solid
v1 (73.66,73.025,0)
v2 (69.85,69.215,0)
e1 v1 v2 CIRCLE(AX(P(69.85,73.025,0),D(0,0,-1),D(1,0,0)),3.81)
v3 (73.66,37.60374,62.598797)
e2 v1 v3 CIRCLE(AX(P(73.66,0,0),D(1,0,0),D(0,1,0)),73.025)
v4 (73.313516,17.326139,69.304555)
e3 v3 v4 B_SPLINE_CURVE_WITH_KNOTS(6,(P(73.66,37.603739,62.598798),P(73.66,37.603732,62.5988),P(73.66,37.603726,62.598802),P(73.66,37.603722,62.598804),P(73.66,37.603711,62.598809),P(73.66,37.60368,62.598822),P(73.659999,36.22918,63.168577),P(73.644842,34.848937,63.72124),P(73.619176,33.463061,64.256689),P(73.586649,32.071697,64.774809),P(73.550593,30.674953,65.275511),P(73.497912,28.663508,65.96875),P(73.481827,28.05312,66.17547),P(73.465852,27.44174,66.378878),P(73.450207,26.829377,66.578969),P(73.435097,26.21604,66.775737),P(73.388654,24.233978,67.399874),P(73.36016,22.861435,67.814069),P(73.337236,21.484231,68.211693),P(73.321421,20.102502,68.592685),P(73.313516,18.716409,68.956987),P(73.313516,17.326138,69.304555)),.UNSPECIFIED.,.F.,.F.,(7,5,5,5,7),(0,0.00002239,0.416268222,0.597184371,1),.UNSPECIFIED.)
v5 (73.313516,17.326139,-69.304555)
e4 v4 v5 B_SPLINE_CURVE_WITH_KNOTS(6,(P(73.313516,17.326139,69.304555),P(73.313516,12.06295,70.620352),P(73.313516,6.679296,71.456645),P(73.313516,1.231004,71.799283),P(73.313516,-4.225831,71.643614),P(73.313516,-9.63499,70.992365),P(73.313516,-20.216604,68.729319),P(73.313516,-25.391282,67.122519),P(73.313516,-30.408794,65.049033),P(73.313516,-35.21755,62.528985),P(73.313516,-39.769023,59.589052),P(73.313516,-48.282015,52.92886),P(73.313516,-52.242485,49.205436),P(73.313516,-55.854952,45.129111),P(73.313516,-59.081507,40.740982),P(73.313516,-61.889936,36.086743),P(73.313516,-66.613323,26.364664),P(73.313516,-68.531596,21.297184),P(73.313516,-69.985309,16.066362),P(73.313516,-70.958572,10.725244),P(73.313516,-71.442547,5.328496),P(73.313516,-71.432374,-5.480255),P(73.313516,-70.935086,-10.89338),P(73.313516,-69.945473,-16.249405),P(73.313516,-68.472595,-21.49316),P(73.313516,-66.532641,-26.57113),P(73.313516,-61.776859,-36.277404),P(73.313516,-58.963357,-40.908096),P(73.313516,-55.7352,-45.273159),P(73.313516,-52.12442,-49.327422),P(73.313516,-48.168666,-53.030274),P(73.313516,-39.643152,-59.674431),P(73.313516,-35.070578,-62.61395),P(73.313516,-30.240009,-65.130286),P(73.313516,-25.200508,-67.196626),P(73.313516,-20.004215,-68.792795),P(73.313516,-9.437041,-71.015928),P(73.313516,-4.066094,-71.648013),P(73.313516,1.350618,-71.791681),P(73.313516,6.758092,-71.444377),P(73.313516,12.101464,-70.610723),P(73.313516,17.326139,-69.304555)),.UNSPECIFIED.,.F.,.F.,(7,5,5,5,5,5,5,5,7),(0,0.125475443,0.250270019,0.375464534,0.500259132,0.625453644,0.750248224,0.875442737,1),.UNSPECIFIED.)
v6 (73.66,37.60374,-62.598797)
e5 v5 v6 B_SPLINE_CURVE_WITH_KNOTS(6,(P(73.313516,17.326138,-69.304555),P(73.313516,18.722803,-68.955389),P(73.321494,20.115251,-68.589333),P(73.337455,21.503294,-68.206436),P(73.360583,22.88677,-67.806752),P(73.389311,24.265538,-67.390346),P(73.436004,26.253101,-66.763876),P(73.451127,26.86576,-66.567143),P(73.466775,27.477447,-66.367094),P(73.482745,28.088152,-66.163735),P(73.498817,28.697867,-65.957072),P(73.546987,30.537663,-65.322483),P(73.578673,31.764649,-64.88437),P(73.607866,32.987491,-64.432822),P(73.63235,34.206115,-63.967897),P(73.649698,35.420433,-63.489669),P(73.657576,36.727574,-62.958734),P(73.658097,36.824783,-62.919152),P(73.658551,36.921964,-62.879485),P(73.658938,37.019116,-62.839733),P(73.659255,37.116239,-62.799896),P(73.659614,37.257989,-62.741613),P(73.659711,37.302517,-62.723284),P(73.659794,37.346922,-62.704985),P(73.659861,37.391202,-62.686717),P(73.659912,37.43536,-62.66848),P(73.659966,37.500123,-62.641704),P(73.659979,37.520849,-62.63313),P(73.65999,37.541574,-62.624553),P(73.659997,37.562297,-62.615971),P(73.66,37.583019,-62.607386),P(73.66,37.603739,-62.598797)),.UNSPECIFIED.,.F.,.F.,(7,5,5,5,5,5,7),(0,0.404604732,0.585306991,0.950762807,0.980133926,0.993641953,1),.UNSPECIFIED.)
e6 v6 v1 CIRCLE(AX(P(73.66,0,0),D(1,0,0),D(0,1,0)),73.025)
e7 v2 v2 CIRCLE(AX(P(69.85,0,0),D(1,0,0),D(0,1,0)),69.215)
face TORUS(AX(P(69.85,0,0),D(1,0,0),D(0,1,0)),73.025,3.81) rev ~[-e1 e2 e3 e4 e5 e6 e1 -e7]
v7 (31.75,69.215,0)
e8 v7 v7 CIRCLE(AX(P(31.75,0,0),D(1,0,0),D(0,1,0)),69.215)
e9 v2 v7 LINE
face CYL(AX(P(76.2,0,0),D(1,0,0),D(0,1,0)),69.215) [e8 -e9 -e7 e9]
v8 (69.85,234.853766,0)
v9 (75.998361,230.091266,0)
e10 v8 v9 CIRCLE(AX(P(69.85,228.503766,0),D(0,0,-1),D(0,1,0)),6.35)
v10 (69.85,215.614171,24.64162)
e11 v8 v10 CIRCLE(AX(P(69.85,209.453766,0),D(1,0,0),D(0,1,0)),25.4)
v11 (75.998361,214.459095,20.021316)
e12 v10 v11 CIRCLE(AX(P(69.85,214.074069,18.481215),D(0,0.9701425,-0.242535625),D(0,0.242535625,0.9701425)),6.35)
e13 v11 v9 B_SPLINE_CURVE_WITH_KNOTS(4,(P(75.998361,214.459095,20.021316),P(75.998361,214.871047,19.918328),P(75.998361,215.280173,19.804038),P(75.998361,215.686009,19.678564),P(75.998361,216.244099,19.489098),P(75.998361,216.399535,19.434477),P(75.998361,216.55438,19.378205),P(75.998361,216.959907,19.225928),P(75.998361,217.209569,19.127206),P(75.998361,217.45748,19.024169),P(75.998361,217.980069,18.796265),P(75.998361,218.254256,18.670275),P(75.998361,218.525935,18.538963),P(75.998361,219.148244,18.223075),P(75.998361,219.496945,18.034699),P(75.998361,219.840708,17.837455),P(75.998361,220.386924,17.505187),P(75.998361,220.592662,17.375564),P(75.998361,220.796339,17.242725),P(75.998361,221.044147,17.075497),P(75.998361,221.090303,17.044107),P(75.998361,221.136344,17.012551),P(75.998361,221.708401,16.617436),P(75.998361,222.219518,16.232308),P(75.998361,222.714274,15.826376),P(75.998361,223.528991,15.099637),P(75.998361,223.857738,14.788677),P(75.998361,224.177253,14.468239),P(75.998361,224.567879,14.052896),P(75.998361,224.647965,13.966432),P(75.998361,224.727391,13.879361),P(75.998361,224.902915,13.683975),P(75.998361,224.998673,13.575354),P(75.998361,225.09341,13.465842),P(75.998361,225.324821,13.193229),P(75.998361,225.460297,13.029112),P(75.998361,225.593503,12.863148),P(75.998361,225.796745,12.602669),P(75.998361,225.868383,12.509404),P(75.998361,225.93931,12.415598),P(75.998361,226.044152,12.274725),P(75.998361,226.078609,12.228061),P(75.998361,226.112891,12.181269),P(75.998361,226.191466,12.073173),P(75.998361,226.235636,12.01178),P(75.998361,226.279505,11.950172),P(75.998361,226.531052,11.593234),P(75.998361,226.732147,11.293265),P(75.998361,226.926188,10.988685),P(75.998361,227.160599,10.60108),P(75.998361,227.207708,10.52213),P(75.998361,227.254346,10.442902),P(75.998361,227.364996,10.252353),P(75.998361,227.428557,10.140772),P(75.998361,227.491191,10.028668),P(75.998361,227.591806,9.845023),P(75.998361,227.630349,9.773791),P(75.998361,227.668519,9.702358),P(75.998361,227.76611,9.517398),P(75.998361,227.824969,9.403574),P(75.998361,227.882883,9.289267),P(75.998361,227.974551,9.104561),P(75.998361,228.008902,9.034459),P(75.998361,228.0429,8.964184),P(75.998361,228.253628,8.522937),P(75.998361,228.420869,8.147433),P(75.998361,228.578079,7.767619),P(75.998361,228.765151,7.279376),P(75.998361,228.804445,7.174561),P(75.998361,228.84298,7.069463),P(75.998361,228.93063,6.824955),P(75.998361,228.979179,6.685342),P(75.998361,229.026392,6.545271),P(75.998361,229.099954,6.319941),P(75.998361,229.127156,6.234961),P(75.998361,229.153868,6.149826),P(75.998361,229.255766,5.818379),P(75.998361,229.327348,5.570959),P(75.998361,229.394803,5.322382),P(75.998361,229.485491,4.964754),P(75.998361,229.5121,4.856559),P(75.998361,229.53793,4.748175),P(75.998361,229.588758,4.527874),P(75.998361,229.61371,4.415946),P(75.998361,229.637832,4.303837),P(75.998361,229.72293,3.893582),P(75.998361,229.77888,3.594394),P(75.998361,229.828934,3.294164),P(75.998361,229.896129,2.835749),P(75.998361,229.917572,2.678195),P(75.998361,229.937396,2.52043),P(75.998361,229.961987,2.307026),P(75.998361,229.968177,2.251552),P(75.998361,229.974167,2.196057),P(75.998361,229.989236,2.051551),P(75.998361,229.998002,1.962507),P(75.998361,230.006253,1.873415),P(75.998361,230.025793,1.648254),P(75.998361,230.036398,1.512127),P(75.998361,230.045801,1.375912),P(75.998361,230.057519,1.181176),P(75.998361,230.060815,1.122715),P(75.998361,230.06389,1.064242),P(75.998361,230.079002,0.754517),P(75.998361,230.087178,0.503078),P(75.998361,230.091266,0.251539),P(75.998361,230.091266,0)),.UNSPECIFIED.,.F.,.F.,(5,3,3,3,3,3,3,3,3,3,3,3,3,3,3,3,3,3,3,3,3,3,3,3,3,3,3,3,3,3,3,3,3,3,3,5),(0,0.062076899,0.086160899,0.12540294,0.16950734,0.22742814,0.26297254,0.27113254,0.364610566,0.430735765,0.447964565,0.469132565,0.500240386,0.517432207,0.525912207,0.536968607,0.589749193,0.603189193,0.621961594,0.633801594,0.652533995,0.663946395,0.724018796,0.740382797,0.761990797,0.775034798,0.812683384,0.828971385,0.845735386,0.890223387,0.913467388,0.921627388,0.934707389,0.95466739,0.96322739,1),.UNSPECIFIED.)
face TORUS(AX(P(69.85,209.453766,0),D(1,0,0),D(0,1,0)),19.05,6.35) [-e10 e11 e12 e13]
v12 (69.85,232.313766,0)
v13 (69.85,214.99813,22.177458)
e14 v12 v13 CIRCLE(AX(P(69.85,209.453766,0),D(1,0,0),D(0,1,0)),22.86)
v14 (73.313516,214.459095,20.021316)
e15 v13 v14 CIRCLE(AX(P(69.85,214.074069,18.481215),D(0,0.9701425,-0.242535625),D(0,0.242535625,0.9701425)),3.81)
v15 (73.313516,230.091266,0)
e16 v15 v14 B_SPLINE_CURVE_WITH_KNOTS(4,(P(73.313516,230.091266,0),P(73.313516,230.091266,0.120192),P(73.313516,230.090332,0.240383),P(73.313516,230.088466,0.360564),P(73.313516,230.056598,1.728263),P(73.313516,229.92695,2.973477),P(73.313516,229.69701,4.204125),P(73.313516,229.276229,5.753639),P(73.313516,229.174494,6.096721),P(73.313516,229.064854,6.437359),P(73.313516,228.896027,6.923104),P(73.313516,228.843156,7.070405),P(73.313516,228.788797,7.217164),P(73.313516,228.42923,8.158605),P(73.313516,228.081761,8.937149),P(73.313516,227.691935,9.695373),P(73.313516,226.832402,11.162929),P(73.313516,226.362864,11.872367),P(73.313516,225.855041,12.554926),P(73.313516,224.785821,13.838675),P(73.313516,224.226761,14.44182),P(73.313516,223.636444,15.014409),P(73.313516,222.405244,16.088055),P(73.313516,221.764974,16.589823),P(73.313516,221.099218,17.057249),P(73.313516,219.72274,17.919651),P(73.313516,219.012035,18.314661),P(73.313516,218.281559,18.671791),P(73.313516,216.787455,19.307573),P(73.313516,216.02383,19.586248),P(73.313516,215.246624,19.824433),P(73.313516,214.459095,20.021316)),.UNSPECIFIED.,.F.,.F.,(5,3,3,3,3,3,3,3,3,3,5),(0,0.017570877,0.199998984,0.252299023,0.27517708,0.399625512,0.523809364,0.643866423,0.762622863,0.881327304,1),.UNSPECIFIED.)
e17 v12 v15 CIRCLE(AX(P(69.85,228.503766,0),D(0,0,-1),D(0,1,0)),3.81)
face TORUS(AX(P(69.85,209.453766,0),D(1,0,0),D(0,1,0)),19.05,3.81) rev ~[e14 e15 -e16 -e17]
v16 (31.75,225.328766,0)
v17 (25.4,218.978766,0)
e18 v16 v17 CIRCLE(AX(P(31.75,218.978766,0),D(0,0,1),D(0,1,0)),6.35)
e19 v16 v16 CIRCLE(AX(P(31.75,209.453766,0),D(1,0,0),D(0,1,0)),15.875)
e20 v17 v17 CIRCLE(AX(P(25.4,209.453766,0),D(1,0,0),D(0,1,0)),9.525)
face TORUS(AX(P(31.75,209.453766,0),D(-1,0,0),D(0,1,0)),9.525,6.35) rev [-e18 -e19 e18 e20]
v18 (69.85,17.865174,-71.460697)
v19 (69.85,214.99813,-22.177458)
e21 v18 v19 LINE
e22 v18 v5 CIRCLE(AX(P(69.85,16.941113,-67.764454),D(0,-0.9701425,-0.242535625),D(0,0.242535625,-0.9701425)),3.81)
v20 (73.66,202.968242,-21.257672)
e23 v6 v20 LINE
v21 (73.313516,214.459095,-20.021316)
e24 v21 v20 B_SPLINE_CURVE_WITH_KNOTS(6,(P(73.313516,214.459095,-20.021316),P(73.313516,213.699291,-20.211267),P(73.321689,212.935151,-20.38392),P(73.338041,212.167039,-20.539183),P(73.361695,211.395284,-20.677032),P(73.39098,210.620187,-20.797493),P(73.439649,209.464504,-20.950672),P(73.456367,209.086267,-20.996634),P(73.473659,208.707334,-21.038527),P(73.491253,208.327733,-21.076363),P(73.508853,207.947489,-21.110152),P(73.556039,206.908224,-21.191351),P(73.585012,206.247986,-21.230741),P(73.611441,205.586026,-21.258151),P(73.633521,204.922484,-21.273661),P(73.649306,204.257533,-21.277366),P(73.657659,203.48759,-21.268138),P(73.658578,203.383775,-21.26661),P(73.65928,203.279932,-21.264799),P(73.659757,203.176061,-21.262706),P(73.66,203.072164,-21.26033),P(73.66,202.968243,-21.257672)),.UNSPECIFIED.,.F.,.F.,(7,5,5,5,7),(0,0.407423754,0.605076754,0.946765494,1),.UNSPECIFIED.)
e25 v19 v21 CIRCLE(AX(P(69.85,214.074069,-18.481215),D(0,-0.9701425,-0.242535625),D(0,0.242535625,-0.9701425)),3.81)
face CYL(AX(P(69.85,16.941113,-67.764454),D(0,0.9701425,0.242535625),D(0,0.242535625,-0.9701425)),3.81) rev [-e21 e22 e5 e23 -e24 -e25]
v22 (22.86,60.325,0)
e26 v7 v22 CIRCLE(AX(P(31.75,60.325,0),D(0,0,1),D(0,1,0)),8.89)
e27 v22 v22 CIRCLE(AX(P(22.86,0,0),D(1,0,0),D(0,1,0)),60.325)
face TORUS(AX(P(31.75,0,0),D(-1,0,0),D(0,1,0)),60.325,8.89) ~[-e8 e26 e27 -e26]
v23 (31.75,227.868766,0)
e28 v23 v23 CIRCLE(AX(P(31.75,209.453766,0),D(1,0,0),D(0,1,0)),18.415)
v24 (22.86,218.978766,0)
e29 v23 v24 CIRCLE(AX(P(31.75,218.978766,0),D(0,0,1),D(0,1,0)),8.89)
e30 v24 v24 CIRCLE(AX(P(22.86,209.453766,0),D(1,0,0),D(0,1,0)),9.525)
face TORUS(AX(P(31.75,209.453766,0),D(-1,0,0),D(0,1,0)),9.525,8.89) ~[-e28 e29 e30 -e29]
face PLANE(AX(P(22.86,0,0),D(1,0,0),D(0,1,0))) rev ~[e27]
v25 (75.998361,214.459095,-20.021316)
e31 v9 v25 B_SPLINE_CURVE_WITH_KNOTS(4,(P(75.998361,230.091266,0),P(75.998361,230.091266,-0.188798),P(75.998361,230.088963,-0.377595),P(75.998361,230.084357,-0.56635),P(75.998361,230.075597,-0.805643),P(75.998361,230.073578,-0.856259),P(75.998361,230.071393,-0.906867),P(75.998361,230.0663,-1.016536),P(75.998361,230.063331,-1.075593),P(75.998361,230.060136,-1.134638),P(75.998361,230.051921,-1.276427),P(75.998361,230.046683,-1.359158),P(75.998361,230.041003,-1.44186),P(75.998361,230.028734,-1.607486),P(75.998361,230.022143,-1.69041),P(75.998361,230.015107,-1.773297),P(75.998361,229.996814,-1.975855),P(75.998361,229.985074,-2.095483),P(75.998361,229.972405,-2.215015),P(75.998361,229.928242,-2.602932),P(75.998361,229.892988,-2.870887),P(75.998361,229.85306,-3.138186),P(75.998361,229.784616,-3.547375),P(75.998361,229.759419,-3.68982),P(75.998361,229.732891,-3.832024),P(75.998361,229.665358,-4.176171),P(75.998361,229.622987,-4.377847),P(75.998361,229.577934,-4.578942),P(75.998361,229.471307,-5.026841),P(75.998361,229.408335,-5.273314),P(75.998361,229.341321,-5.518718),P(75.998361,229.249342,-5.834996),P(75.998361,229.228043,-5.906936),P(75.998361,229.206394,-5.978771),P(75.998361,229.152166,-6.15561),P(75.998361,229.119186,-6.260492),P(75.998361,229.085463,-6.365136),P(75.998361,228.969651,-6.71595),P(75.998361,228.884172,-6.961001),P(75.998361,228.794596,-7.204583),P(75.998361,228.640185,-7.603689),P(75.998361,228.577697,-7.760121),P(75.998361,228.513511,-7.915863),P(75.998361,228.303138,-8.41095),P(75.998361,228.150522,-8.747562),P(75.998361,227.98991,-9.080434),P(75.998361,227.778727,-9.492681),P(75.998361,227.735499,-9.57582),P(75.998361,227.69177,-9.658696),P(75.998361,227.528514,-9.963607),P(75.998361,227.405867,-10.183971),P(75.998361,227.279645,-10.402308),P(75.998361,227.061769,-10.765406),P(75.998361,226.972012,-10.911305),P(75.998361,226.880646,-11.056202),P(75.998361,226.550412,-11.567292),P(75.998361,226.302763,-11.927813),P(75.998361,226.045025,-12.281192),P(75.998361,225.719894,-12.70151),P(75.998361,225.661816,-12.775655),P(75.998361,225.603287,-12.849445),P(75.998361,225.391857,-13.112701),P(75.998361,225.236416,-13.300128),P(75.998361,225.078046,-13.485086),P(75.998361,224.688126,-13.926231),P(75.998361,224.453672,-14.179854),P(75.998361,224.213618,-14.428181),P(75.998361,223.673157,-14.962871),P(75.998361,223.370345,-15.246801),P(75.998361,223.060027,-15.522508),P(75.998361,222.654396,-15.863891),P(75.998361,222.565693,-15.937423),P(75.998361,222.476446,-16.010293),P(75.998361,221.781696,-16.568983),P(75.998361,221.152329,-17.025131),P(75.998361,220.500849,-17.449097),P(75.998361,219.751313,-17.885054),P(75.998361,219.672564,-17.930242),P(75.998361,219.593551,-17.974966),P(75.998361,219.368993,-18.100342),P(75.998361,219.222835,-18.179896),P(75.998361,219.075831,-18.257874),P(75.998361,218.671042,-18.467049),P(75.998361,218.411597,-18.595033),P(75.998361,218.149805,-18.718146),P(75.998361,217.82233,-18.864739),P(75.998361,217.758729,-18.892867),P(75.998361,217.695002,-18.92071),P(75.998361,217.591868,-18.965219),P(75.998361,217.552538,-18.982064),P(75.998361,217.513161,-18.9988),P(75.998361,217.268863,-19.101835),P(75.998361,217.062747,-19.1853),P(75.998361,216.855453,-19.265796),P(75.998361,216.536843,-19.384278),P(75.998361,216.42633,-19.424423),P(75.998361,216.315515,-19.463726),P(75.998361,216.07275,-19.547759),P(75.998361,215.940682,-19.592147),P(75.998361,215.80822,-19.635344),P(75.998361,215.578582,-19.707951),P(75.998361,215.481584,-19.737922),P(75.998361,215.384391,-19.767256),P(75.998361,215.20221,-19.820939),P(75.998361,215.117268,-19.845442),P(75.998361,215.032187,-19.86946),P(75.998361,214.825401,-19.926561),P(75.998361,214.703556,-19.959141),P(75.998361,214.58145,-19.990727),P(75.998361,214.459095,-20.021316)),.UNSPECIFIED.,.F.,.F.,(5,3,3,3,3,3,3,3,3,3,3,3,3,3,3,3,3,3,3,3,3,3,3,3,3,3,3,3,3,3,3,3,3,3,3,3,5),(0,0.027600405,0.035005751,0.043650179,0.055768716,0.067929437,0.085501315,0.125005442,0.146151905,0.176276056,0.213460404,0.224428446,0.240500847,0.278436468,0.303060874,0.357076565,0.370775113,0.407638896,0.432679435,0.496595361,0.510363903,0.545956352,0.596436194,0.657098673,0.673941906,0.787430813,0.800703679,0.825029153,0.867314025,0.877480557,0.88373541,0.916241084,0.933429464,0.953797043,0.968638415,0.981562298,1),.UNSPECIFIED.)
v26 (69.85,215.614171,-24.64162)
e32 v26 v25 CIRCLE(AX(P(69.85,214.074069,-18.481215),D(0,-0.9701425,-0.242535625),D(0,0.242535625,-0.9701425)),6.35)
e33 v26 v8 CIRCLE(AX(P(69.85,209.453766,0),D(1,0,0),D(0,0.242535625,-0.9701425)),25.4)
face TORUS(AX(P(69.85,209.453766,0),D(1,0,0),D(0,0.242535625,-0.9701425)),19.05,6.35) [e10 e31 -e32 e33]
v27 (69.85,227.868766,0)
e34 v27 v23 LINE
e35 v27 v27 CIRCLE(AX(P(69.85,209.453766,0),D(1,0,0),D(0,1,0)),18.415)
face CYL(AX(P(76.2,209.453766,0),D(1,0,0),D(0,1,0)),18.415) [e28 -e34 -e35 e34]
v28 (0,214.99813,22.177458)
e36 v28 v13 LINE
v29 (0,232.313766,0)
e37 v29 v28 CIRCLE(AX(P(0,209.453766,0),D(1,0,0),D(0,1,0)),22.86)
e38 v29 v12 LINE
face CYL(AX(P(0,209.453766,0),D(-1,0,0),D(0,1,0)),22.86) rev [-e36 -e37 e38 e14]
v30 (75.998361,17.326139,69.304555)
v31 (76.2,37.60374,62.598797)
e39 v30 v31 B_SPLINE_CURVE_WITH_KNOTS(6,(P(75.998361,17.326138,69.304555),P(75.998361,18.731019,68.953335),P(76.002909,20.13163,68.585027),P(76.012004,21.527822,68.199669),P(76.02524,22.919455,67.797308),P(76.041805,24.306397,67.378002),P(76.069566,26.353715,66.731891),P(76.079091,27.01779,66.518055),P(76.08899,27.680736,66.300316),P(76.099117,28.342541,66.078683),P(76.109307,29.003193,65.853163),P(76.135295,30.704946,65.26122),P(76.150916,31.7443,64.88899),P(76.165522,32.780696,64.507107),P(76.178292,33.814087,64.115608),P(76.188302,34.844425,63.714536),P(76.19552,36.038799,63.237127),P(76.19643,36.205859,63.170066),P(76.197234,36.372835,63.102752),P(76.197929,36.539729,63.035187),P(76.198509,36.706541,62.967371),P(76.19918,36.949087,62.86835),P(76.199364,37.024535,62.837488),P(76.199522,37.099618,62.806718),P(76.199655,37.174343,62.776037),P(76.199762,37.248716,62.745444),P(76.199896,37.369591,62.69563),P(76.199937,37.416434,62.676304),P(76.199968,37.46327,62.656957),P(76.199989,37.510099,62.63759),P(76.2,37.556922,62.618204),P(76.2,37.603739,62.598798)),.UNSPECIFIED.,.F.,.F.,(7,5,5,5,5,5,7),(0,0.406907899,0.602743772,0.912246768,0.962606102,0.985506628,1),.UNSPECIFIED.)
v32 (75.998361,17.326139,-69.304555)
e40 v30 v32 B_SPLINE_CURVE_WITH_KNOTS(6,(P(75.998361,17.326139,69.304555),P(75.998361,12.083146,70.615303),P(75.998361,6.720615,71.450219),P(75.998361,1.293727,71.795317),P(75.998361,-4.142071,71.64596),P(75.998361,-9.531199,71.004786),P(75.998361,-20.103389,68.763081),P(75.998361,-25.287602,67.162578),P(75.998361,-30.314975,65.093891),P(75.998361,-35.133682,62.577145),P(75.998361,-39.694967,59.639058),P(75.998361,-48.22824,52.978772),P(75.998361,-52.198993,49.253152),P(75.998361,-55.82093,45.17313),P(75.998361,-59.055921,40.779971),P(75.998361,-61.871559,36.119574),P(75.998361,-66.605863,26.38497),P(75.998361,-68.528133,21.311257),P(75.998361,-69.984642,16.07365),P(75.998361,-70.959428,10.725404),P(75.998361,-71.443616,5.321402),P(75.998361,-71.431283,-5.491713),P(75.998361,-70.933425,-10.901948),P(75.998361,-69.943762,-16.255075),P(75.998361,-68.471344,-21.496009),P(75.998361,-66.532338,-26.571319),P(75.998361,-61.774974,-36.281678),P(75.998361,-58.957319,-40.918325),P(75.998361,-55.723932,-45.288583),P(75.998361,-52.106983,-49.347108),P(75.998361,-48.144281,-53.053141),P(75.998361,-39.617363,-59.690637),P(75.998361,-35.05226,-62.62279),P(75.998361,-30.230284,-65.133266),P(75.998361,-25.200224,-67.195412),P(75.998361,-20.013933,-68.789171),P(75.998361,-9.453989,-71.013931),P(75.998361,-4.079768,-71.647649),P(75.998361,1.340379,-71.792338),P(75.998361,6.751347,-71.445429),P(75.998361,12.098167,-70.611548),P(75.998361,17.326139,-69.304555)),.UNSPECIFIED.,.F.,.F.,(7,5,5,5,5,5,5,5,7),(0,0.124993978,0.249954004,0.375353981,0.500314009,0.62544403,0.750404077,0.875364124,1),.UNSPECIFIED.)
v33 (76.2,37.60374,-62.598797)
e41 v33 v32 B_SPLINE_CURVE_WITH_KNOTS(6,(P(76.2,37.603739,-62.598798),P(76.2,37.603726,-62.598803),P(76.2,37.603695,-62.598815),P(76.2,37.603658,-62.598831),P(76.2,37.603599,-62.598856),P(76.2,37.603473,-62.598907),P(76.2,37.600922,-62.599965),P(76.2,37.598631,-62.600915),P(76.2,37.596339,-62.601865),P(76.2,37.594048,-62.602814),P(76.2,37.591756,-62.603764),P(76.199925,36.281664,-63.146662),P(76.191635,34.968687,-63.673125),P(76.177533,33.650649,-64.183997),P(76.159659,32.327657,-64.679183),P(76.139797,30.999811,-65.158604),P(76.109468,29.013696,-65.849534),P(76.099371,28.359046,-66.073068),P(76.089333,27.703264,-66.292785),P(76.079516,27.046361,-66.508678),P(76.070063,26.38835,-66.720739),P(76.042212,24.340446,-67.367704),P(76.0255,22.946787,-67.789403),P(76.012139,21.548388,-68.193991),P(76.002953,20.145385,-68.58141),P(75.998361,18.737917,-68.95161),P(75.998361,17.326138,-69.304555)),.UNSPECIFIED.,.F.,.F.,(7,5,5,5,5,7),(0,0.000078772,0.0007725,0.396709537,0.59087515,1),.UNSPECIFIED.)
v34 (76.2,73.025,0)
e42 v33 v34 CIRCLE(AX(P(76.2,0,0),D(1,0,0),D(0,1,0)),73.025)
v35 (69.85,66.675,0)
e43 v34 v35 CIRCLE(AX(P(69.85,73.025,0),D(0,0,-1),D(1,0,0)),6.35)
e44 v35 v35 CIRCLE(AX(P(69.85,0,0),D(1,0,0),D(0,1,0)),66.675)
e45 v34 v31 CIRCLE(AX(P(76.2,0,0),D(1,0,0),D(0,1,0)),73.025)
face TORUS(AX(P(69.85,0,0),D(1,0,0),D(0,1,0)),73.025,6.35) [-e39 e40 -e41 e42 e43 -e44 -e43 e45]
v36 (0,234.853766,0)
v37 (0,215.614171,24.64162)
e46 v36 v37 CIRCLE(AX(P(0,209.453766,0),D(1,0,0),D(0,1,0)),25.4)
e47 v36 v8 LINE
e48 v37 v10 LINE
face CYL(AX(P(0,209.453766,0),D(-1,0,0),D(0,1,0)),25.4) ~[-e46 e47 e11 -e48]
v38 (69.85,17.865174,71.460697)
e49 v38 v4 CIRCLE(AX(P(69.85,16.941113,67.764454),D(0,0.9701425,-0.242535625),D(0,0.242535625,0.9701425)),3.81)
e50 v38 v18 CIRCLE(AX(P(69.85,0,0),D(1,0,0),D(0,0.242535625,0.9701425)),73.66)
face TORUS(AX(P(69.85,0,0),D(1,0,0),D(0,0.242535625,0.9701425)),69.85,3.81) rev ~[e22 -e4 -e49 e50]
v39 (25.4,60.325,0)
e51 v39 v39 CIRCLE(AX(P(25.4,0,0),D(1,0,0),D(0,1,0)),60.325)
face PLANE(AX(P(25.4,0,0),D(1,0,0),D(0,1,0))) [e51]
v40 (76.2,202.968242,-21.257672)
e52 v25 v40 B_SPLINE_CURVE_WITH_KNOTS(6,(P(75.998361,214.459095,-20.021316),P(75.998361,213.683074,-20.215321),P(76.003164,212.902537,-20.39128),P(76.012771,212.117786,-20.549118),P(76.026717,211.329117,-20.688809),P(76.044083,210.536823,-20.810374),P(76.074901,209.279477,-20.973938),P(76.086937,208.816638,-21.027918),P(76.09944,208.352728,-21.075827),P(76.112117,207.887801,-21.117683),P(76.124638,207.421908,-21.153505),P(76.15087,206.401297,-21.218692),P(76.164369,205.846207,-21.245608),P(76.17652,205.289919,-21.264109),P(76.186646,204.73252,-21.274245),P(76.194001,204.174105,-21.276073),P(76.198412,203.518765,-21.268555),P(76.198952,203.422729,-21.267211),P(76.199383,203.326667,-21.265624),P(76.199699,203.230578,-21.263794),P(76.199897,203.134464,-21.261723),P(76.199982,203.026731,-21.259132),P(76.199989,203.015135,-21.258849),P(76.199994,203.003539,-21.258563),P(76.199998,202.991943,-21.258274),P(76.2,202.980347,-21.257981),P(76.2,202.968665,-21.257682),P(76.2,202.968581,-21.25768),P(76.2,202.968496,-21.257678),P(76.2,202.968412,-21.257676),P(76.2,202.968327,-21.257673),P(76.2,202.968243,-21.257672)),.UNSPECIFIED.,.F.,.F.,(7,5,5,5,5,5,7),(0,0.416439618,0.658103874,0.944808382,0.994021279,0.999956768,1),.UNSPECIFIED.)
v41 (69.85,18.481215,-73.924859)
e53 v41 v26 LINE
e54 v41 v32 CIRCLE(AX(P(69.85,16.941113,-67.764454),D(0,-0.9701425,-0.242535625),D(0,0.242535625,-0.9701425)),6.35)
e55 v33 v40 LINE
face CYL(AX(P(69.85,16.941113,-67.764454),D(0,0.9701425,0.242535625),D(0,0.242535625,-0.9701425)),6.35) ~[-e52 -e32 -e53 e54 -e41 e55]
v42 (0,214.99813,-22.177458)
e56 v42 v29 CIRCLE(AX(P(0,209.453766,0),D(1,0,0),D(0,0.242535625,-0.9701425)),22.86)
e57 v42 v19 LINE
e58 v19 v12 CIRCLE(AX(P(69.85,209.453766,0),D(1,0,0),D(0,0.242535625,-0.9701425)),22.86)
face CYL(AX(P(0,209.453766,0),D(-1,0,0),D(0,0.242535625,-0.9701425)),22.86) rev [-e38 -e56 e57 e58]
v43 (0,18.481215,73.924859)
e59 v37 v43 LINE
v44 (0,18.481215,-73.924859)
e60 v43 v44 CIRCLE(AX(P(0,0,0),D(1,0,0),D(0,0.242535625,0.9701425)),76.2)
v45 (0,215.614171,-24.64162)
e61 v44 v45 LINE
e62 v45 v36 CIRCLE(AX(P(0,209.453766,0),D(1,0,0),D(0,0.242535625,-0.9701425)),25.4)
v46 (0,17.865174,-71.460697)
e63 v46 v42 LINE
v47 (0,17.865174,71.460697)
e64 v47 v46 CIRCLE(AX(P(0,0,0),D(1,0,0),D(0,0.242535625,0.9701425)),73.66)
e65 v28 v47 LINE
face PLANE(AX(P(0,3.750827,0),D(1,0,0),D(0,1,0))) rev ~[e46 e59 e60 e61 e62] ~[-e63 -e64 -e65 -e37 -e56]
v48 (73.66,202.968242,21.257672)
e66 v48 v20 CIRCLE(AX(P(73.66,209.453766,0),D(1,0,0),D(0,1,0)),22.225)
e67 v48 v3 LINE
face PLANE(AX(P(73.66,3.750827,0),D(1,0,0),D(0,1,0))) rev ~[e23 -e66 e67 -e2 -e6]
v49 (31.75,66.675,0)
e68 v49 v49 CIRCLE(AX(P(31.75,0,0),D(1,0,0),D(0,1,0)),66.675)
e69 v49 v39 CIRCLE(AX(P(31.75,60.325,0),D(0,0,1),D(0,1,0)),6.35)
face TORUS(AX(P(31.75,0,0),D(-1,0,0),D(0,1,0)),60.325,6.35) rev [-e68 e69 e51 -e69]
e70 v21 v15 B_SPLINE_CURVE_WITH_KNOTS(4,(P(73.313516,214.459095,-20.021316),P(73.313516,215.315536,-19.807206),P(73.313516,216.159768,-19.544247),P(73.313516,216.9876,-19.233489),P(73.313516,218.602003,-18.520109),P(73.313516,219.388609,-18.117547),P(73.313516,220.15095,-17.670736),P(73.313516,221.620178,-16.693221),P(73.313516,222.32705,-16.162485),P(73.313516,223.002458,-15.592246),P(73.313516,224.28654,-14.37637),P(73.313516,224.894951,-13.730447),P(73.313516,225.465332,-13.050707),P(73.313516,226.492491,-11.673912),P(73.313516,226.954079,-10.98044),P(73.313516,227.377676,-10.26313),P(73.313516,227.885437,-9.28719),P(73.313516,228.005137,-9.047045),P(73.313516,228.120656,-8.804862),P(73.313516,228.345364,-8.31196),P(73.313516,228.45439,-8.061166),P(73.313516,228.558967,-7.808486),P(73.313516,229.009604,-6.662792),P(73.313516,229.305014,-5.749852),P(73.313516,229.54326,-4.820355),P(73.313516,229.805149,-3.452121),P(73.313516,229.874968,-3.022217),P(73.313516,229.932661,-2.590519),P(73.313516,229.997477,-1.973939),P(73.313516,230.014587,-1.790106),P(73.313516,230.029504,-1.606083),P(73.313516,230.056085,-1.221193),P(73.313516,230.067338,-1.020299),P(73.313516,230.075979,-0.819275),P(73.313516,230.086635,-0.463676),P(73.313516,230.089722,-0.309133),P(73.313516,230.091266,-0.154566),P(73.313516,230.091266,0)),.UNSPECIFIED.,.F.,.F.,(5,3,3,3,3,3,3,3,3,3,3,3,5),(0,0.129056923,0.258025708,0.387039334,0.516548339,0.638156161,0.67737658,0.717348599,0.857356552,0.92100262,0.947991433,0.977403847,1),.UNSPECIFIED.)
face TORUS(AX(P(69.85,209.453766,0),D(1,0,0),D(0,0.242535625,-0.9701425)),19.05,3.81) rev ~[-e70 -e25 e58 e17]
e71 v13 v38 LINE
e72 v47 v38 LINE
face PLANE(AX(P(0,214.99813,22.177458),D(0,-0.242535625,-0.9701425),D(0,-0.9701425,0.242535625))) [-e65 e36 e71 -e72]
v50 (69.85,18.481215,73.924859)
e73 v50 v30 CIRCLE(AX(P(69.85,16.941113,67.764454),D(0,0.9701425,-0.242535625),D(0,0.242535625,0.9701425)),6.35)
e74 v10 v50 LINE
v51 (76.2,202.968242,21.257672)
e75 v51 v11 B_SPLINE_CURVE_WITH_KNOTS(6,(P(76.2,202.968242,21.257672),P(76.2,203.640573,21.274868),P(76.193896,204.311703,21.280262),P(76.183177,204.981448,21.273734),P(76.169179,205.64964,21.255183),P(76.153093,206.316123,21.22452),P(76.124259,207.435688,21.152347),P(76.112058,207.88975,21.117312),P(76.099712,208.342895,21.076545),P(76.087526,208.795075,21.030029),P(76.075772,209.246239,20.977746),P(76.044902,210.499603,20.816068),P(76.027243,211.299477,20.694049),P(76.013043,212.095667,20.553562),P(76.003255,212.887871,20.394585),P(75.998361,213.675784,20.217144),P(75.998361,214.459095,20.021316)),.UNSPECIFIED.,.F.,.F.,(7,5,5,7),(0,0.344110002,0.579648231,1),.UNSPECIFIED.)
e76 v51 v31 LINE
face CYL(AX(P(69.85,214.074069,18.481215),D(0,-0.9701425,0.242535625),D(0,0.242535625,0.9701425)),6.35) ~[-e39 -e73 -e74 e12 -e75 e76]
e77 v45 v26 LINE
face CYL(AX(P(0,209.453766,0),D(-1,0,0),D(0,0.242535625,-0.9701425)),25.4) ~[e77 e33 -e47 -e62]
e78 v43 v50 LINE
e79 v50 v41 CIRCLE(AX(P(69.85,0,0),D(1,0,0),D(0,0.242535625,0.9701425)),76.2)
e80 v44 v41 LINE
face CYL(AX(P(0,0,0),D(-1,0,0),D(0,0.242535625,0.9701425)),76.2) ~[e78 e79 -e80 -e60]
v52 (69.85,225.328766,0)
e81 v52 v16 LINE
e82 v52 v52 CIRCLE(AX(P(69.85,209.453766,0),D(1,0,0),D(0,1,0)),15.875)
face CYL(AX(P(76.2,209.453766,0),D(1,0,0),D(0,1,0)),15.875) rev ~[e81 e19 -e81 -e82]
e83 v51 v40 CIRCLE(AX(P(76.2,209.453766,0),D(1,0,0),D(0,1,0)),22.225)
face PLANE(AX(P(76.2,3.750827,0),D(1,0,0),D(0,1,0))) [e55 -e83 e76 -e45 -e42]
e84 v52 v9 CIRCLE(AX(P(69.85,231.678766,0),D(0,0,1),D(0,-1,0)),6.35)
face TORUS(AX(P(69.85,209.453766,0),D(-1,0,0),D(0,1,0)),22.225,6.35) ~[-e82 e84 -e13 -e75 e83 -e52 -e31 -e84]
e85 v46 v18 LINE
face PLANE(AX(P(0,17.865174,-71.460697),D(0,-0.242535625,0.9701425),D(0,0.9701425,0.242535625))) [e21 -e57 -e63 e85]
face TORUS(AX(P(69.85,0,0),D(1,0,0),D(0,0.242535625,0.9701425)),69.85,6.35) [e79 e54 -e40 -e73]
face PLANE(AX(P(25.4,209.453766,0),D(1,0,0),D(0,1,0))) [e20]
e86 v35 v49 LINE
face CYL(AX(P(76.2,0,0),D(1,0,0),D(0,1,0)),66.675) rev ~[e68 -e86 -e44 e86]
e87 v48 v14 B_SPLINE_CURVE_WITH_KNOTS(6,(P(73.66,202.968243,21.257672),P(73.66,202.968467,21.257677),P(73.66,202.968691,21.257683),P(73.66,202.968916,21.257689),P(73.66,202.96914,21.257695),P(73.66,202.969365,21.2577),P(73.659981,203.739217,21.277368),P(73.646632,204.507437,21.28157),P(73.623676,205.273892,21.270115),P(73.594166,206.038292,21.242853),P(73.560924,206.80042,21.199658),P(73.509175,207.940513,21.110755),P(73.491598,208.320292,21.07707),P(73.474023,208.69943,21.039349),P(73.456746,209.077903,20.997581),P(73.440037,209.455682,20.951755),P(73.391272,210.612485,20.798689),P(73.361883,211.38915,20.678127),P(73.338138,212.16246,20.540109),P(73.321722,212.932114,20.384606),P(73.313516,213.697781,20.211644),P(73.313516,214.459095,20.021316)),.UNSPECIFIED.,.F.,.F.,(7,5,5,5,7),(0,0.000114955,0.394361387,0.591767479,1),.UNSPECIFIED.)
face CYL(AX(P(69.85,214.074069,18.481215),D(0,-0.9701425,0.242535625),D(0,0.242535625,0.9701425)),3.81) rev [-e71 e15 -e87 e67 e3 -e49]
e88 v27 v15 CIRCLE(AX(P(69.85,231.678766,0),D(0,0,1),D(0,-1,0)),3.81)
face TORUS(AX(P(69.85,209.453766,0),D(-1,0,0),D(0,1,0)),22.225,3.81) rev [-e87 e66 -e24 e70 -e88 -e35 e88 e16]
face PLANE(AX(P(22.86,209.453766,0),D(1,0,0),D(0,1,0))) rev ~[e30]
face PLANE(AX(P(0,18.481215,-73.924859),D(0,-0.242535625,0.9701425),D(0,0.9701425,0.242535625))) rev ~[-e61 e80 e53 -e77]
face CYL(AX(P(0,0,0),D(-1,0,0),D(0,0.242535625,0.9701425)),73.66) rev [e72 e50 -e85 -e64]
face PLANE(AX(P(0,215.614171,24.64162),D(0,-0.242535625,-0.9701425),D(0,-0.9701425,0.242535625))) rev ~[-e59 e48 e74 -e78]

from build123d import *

# Parameters (mm, degrees)
F1_DEPTH = 76.2
F2_R     = 66.675
F2_R_2   = 15.875
F3_DEPTH = 50.8
F4_F1_R  = 6.35
F4_F2_R  = 6.35
F4_F3_R  = 6.35
F5_T     = -2.54


# Not quite as in the source:
# - a fillet or chamfer that OpenCascade refuses, or shapes differently, is made with other operations: its cross-section is extruded or revolved along the edge and cut away or added


with BuildPart() as f1:
    # F0 (on Right) → F1 (new body)
    with BuildSketch(Plane.YZ):
        with BuildLine():
            ThreePointArc((18.4812146278, -73.9248585111), (60.0612543768, -46.8944103565), (76.2, 0))
            ThreePointArc((76.2, 0), (60.0612543768, 46.8944103565), (18.4812146278, 73.9248585111))
            ThreePointArc((18.4812146278, 73.9248585111), (-76.2, 0), (18.4812146278, -73.9248585111))
        make_face()
        with BuildLine():
            ThreePointArc((18.4812146278, 73.9248585111), (60.0612543768, 46.8944103565), (76.2, 0))
            ThreePointArc((76.2, 0), (60.0612543768, -46.8944103565), (18.4812146278, -73.9248585111))
            Line((18.4812146278, -73.9248585111), (215.6141706573, -24.6416195037))
            ThreePointArc((215.6141706573, -24.6416195037), (184.0537657814, 0), (215.6141706573, 24.6416195037))
            Line((215.6141706573, 24.6416195037), (18.4812146278, 73.9248585111))
        make_face()
        with BuildLine():
            ThreePointArc((234.8537657814, 0), (229.474183907, 15.6314701188), (215.6141706573, 24.6416195037))
            ThreePointArc((215.6141706573, 24.6416195037), (184.0537657814, 0), (215.6141706573, -24.6416195037))
            ThreePointArc((215.6141706573, -24.6416195037), (229.474183907, -15.6314701188), (234.8537657814, 0))
        make_face()
    extrude(amount=F1_DEPTH)

    # F2 (on face) → F3 (cut)
    with BuildSketch(Plane.YZ.offset(76.2)):
        Circle(F2_R)
        with Locations((209.4537657814, 0)):
            Circle(F2_R_2)
    extrude(amount=-F3_DEPTH, mode=Mode.SUBTRACT)

    # F4: fillet of radius 6.35 on 8 edges, made by hand

    # F4_f1
    f4_f1_edges = [f1.edges().sort_by_distance(p)[0] for p in [
        (76.2, -76.2, 0),
        (76.2, 117.0476926425, 49.2832390074),
        (76.2, 117.0476926425, -49.2832390074),
        (76.2, 234.8537657814, 0),
    ]]
    fillet(f4_f1_edges, radius=F4_F1_R)

    # F4_f2
    f4_f2_edges = [f1.edges().sort_by_distance(p)[0] for p in [
        (25.4, -66.675, 0),
    ]]
    fillet(f4_f2_edges, radius=F4_F2_R)

    # F4_f3
    f4_f3_edges = [f1.edges().sort_by_distance(p)[0] for p in [
        (25.4, 193.5787657814, 0),
    ]]
    fillet(f4_f3_edges, radius=F4_F3_R)

    # F4_s4 → F4_t5 (revolve, cut)
    with BuildSketch(Plane.XY):
        with BuildLine():
            ThreePointArc((76.2, 73.025), (74.3401280605, 68.5348719395), (69.85, 66.675))
            Line((69.85, 66.675), (69.85, 66.548))
            Line((69.85, 66.548), (76.327, 66.548))
            Line((76.327, 66.548), (76.327, 73.025))
            Line((76.327, 73.025), (76.2, 73.025))
        make_face()
    revolve(axis=Axis((76.2, 0, 0), (1, 0, 0)), mode=Mode.SUBTRACT)

    # F4_s6 → F4_t7 (revolve, cut)
    with BuildSketch(Plane.XY):
        with BuildLine():
            ThreePointArc((69.85, 225.3287657814), (74.3401280605, 227.1886377208), (76.2, 231.6787657814))
            Line((76.2, 231.6787657814), (76.327, 231.6787657814))
            Line((76.327, 231.6787657814), (76.327, 225.2017657814))
            Line((76.327, 225.2017657814), (69.85, 225.2017657814))
            Line((69.85, 225.2017657814), (69.85, 225.3287657814))
        make_face()
    revolve(axis=Axis((76.2, 209.4537657814, 0), (1, 0, 0)), mode=Mode.SUBTRACT)

    # F5
    f5_openings = [f1.faces().sort_by_distance(p)[0] for p in [
        (0, 57.51924, 0),
    ]]
    offset(amount=F5_T, openings=f5_openings)


solid = f1.part
